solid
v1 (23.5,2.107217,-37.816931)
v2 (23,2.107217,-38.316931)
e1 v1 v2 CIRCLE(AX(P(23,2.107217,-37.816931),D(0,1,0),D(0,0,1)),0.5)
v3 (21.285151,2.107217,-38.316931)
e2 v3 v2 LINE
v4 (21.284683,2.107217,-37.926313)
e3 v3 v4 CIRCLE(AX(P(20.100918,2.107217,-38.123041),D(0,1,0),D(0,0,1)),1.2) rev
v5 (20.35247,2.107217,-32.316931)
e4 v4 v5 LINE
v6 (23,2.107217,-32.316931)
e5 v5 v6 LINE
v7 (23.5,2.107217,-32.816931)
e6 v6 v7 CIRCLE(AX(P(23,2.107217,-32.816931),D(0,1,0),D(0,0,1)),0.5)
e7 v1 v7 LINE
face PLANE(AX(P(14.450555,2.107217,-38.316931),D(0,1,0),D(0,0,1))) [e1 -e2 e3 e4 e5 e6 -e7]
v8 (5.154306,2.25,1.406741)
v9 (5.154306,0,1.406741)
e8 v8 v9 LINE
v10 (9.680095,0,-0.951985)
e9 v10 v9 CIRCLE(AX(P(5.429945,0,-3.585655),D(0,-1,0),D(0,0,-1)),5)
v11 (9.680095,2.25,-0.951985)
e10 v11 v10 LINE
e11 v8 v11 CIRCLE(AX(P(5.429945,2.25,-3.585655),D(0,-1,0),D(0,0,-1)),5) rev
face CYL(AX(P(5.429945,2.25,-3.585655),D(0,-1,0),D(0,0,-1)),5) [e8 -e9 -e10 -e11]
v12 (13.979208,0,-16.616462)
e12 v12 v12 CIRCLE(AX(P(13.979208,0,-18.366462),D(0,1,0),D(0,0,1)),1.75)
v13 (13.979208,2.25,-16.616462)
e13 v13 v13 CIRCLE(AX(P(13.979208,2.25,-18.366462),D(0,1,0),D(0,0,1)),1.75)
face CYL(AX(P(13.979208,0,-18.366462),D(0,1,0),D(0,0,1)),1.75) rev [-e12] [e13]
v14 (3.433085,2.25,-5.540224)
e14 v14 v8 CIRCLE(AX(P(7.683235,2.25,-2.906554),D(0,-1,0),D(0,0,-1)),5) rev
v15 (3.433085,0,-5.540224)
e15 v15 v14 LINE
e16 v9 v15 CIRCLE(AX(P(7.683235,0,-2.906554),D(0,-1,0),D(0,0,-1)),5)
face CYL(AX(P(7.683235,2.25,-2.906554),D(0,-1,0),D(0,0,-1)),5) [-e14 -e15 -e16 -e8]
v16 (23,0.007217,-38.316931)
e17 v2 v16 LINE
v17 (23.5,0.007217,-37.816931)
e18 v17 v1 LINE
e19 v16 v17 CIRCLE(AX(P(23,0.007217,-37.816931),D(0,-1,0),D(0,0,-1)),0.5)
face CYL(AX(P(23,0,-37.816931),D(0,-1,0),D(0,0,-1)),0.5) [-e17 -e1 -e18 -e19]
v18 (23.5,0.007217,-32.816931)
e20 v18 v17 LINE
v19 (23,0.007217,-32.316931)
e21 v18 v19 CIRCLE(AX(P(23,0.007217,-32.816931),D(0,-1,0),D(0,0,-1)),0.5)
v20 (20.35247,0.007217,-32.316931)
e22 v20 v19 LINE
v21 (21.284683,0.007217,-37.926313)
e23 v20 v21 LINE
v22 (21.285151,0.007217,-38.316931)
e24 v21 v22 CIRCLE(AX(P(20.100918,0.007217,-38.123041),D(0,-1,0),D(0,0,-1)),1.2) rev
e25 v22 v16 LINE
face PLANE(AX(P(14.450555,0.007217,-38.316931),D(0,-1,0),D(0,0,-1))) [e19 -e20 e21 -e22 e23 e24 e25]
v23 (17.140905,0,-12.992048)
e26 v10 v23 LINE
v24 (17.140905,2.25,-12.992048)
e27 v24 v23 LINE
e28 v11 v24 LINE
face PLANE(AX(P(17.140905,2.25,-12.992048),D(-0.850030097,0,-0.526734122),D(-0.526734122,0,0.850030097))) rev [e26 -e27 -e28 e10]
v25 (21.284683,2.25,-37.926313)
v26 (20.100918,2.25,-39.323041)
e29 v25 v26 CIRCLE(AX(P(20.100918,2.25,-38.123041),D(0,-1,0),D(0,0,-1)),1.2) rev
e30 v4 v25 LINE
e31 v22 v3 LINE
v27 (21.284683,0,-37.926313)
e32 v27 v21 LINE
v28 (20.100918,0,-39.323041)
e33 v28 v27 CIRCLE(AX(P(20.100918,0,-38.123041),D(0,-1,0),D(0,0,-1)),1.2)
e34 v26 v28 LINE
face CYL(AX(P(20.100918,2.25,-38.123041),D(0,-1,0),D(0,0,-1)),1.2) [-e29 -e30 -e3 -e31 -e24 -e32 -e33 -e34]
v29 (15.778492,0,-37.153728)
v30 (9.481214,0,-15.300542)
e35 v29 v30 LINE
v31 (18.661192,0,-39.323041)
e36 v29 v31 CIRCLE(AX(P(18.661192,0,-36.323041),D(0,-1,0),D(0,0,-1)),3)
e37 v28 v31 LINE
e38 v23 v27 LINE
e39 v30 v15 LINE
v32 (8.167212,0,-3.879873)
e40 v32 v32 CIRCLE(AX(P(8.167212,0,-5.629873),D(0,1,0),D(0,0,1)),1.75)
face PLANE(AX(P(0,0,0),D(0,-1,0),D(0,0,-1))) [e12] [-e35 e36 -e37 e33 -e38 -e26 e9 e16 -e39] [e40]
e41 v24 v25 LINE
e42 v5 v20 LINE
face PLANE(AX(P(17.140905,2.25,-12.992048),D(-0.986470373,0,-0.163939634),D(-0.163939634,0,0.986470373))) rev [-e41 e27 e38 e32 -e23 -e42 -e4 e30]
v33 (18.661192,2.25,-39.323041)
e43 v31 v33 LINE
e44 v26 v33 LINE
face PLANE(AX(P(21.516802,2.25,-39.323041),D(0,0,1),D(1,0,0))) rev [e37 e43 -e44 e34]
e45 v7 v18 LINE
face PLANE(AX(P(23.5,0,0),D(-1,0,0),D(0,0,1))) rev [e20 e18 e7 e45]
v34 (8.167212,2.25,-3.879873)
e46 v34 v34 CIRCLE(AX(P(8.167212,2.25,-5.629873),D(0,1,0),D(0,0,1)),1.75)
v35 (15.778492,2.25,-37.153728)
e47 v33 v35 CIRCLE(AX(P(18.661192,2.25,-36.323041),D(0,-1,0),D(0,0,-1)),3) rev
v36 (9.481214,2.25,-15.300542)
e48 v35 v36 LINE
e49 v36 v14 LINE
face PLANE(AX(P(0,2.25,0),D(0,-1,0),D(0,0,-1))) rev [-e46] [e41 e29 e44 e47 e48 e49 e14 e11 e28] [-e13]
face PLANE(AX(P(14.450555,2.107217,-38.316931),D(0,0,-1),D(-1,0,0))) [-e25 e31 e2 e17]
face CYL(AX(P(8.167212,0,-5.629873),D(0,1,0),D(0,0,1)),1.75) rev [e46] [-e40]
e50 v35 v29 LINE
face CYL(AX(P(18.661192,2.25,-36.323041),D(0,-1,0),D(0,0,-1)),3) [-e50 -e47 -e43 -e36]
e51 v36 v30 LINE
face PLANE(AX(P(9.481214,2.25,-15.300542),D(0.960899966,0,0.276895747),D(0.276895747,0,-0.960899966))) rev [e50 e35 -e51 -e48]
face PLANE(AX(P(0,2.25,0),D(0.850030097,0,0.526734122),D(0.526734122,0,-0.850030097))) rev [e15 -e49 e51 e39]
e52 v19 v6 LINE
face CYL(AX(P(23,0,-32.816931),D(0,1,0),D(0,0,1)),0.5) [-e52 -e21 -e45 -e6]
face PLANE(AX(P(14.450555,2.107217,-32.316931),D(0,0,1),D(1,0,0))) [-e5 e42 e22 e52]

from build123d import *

# Parameters (mm, degrees)
BOSS_EXTRUDE1_DEPTH = 2.25
FILLET1_R           = 5
SKETCH2_R           = 1.75
CUT_EXTRUDE1_DEPTH  = 45.881363874
BOSS_EXTRUDE2_REACH = 39.627
SKETCH4_W           = 6
SKETCH4_H           = 2.1
SKETCH4_2_W         = 6
SKETCH4_2_H         = 2.1
BOSS_EXTRUDE3_DEPTH = 2.150401339
FILLET2_R           = 3
FILLET3_R           = 1.2
FILLET4_R           = 0.5


with BuildPart() as part:
    # Sketch1 → Boss-Extrude1 (new body)
    with BuildSketch(Plane(origin=(0, 0, 0), x_dir=(1, 0, 0), z_dir=(0, 1, 0))):
        Polygon((0, 0), (9.481214188, 15.300541739), (16.403607864, 39.323040897), (21.51680222, 39.323040897), (17.140904697, 12.99204844), (7.659690509, -2.308493299), align=None)
    extrude(amount=BOSS_EXTRUDE1_DEPTH)

    # Fillet1
    # the kernel refuses this fillet: 5 mm, written as the material it takes off along each edge
    with BuildSketch(Plane(origin=(7.659690509, -9.589301146, 2.308493299), x_dir=(0.5267341215597666, 0, -0.8500300966346198), z_dir=(0, 1, 0))) as fillet1_piece_1:
        with BuildLine():
            CenterArc((FILLET1_R * 0.767144091705, FILLET1_R), FILLET1_R, 195.013192562, 74.986807438)
            Line((-FILLET1_R * 0.19872211495, FILLET1_R * 0.740958553812), (0, 0))
            Line((0, 0), (FILLET1_R * 0.767144091705, 0))
        make_face()
    extrude(amount=21.428602293, mode=Mode.SUBTRACT)
    with BuildSketch(Plane(origin=(0, -16.294200966, 0), x_dir=(0.5267341215597675, 0, -0.8500300966346193), z_dir=(0, 1, 0))) as fillet1_piece_2:
        with BuildLine():
            CenterArc((FILLET1_R * 1.30353607727, -FILLET1_R), FILLET1_R, 90, 105.013192562)
            Line((FILLET1_R * 0.337669870614, -FILLET1_R * 1.25904144619), (0, 0))
            Line((0, 0), (FILLET1_R * 1.30353607727, 0))
        make_face()
    extrude(amount=34.838401932, mode=Mode.SUBTRACT)

    # Sketch2 → Cut-Extrude1 (cut, through all)
    with BuildSketch(Plane(origin=(0, 2.25, 0), x_dir=(1, 0, 0), z_dir=(0, 1, 0))):
        with Locations(Location((8.167211871, 5.629873064, 0), (0, 0, 270))):
            Circle(SKETCH2_R)
        with Locations(Location((13.979207558, 18.366462331, 0), (0, 0, 270))):
            Circle(SKETCH2_R)
    extrude(amount=-CUT_EXTRUDE1_DEPTH, mode=Mode.SUBTRACT)

    # Boss-Extrude2: up to this plane
    boss_extrude2_end = Plane(origin=(17.140904697, 2.25, -12.99204844), z_dir=(-0.9864703728289792, 0, -0.16393963380053925))
    # Sketch4 → Boss-Extrude2 (add, up to the surface)
    with BuildSketch(Plane(origin=(23.5, -1.484709168, -8.201879583), x_dir=(0, 0, -1), z_dir=(1, 0, 0)), mode=Mode.PRIVATE) as boss_extrude2_sk1:
        with Locations((27.115050996, 2.541926215)):
            Rectangle(SKETCH4_W, SKETCH4_H)
    boss_extrude2_tool1 = split(extrude(boss_extrude2_sk1.sketch, amount=-BOSS_EXTRUDE2_REACH, mode=Mode.PRIVATE), bisect_by=boss_extrude2_end, keep=Keep.BOTH, mode=Mode.PRIVATE)
    add(boss_extrude2_tool1.solids().sort_by_distance((23.5, 1.057217, -35.316931))[0])

    # Sketch4<2> → Boss-Extrude3 (add)
    with BuildSketch(Plane(origin=(23.5, -1.484709168, -8.201879583), x_dir=(0, 0, -1), z_dir=(1, 0, 0))):
        with Locations((27.115050996, 2.541926215)):
            Rectangle(SKETCH4_2_W, SKETCH4_2_H)
    extrude(amount=-BOSS_EXTRUDE3_DEPTH)

    # Fillet2
    fillet2_edges = [part.edges().sort_by_distance(p)[0] for p in [
        (16.403607864, 1.125, -39.323040897),
    ]]
    fillet(fillet2_edges, radius=FILLET2_R)

    # Fillet3
    # the kernel refuses this fillet: 1.2 mm, written as the material it takes off along each edge
    with BuildSketch(Plane(origin=(21.51680222, -3.539709856, -39.323040897), x_dir=(-1, 0, 0), z_dir=(0, 1, 0))) as fillet3_piece_1_section:
        with BuildLine():
            CenterArc((FILLET3_R * 1.17990328535, FILLET3_R), FILLET3_R, 170.564358813, 99.435641187)
            Line((FILLET3_R * 0.19343291252, FILLET3_R * 1.1639396338), (0, 0))
            Line((0, 0), (FILLET3_R * 1.17990328535, 0))
        make_face()
    fillet3_piece_1 = extrude(amount=9.329419712, mode=Mode.PRIVATE)
    fillet3_piece_1 = split(fillet3_piece_1, bisect_by=Plane(origin=(21.129198659, 0.007217047, -39.030141568), z_dir=(0, -1, 0)), keep=Keep.TOP, mode=Mode.PRIVATE)
    fillet3_piece_1 = split(fillet3_piece_1, bisect_by=Plane(origin=(21.129198659, -1.766246404, -38.316930579), z_dir=(0, 0, -1)), keep=Keep.TOP, mode=Mode.PRIVATE)
    add(fillet3_piece_1, mode=Mode.SUBTRACT)
    with BuildSketch(Plane(origin=(21.51680222, -3.539709856, -39.323040897), x_dir=(-1, 0, 0), z_dir=(0, 1, 0))) as fillet3_piece_2_section:
        with BuildLine():
            CenterArc((FILLET3_R * 1.17990328535, FILLET3_R), FILLET3_R, 170.564358813, 99.435641187)
            Line((FILLET3_R * 0.19343291252, FILLET3_R * 1.1639396338), (0, 0))
            Line((0, 0), (FILLET3_R * 1.17990328535, 0))
        make_face()
    fillet3_piece_2 = extrude(amount=9.329419712, mode=Mode.PRIVATE)
    fillet3_piece_2 = split(fillet3_piece_2, bisect_by=Plane(origin=(21.322056941, 0.007217047, -38.16671154), z_dir=(0, -1, 0)), keep=Keep.TOP, mode=Mode.PRIVATE)
    fillet3_piece_2 = split(fillet3_piece_2, bisect_by=Plane(origin=(21.322056941, -1.766246404, -38.316930579), z_dir=(0, 0, 1)), keep=Keep.TOP, mode=Mode.PRIVATE)
    add(fillet3_piece_2, mode=Mode.SUBTRACT)
    with BuildSketch(Plane(origin=(21.51680222, -3.539709856, -39.323040897), x_dir=(-1, 0, 0), z_dir=(0, 1, 0))) as fillet3_piece_3_section:
        with BuildLine():
            CenterArc((FILLET3_R * 1.17990328535, FILLET3_R), FILLET3_R, 170.564358813, 99.435641187)
            Line((FILLET3_R * 0.19343291252, FILLET3_R * 1.1639396338), (0, 0))
            Line((0, 0), (FILLET3_R * 1.17990328535, 0))
        make_face()
    fillet3_piece_3 = extrude(amount=9.329419712, mode=Mode.PRIVATE)
    fillet3_piece_3 = split(fillet3_piece_3, bisect_by=Plane(origin=(21.129198659, 2.107217047, -39.030141568), z_dir=(0, -1, 0)), keep=Keep.TOP, mode=Mode.PRIVATE)
    fillet3_piece_3 = split(fillet3_piece_3, bisect_by=Plane(origin=(21.129198659, 0.007217047, -39.030141568), z_dir=(0, 1, 0)), keep=Keep.TOP, mode=Mode.PRIVATE)
    fillet3_piece_3 = split(fillet3_piece_3, bisect_by=Plane(origin=(21.129198659, 1.057217047, -38.316930579), z_dir=(0, 0, -1)), keep=Keep.TOP, mode=Mode.PRIVATE)
    add(fillet3_piece_3, mode=Mode.SUBTRACT)
    with BuildSketch(Plane(origin=(21.51680222, -3.539709856, -39.323040897), x_dir=(-1, 0, 0), z_dir=(0, 1, 0))) as fillet3_piece_4_section:
        with BuildLine():
            CenterArc((FILLET3_R * 1.17990328535, FILLET3_R), FILLET3_R, 170.564358813, 99.435641187)
            Line((FILLET3_R * 0.19343291252, FILLET3_R * 1.1639396338), (0, 0))
            Line((0, 0), (FILLET3_R * 1.17990328535, 0))
        make_face()
    fillet3_piece_4 = extrude(amount=9.329419712, mode=Mode.PRIVATE)
    fillet3_piece_4 = split(fillet3_piece_4, bisect_by=Plane(origin=(21.129198659, 2.107217047, -39.030141568), z_dir=(0, 1, 0)), keep=Keep.TOP, mode=Mode.PRIVATE)
    fillet3_piece_4 = split(fillet3_piece_4, bisect_by=Plane(origin=(21.129198659, 3.948463452, -38.316930579), z_dir=(0, 0, -1)), keep=Keep.TOP, mode=Mode.PRIVATE)
    add(fillet3_piece_4, mode=Mode.SUBTRACT)
    with BuildSketch(Plane(origin=(21.51680222, -3.539709856, -39.323040897), x_dir=(-1, 0, 0), z_dir=(0, 1, 0))) as fillet3_piece_5_section:
        with BuildLine():
            CenterArc((FILLET3_R * 1.17990328535, FILLET3_R), FILLET3_R, 170.564358813, 99.435641187)
            Line((FILLET3_R * 0.19343291252, FILLET3_R * 1.1639396338), (0, 0))
            Line((0, 0), (FILLET3_R * 1.17990328535, 0))
        make_face()
    fillet3_piece_5 = extrude(amount=9.329419712, mode=Mode.PRIVATE)
    fillet3_piece_5 = split(fillet3_piece_5, bisect_by=Plane(origin=(21.322056941, 2.107217047, -38.16671154), z_dir=(0, 1, 0)), keep=Keep.TOP, mode=Mode.PRIVATE)
    fillet3_piece_5 = split(fillet3_piece_5, bisect_by=Plane(origin=(21.322056941, 3.948463452, -38.316930579), z_dir=(0, 0, 1)), keep=Keep.TOP, mode=Mode.PRIVATE)
    add(fillet3_piece_5, mode=Mode.SUBTRACT)

    # Fillet4
    fillet4_edges = [part.edges().sort_by_distance(p)[0] for p in [
        (23.5, 1.057217047, -38.316930579),
        (23.5, 1.057217047, -32.316930579),
    ]]
    fillet(fillet4_edges, radius=FILLET4_R)


solid = part.part
